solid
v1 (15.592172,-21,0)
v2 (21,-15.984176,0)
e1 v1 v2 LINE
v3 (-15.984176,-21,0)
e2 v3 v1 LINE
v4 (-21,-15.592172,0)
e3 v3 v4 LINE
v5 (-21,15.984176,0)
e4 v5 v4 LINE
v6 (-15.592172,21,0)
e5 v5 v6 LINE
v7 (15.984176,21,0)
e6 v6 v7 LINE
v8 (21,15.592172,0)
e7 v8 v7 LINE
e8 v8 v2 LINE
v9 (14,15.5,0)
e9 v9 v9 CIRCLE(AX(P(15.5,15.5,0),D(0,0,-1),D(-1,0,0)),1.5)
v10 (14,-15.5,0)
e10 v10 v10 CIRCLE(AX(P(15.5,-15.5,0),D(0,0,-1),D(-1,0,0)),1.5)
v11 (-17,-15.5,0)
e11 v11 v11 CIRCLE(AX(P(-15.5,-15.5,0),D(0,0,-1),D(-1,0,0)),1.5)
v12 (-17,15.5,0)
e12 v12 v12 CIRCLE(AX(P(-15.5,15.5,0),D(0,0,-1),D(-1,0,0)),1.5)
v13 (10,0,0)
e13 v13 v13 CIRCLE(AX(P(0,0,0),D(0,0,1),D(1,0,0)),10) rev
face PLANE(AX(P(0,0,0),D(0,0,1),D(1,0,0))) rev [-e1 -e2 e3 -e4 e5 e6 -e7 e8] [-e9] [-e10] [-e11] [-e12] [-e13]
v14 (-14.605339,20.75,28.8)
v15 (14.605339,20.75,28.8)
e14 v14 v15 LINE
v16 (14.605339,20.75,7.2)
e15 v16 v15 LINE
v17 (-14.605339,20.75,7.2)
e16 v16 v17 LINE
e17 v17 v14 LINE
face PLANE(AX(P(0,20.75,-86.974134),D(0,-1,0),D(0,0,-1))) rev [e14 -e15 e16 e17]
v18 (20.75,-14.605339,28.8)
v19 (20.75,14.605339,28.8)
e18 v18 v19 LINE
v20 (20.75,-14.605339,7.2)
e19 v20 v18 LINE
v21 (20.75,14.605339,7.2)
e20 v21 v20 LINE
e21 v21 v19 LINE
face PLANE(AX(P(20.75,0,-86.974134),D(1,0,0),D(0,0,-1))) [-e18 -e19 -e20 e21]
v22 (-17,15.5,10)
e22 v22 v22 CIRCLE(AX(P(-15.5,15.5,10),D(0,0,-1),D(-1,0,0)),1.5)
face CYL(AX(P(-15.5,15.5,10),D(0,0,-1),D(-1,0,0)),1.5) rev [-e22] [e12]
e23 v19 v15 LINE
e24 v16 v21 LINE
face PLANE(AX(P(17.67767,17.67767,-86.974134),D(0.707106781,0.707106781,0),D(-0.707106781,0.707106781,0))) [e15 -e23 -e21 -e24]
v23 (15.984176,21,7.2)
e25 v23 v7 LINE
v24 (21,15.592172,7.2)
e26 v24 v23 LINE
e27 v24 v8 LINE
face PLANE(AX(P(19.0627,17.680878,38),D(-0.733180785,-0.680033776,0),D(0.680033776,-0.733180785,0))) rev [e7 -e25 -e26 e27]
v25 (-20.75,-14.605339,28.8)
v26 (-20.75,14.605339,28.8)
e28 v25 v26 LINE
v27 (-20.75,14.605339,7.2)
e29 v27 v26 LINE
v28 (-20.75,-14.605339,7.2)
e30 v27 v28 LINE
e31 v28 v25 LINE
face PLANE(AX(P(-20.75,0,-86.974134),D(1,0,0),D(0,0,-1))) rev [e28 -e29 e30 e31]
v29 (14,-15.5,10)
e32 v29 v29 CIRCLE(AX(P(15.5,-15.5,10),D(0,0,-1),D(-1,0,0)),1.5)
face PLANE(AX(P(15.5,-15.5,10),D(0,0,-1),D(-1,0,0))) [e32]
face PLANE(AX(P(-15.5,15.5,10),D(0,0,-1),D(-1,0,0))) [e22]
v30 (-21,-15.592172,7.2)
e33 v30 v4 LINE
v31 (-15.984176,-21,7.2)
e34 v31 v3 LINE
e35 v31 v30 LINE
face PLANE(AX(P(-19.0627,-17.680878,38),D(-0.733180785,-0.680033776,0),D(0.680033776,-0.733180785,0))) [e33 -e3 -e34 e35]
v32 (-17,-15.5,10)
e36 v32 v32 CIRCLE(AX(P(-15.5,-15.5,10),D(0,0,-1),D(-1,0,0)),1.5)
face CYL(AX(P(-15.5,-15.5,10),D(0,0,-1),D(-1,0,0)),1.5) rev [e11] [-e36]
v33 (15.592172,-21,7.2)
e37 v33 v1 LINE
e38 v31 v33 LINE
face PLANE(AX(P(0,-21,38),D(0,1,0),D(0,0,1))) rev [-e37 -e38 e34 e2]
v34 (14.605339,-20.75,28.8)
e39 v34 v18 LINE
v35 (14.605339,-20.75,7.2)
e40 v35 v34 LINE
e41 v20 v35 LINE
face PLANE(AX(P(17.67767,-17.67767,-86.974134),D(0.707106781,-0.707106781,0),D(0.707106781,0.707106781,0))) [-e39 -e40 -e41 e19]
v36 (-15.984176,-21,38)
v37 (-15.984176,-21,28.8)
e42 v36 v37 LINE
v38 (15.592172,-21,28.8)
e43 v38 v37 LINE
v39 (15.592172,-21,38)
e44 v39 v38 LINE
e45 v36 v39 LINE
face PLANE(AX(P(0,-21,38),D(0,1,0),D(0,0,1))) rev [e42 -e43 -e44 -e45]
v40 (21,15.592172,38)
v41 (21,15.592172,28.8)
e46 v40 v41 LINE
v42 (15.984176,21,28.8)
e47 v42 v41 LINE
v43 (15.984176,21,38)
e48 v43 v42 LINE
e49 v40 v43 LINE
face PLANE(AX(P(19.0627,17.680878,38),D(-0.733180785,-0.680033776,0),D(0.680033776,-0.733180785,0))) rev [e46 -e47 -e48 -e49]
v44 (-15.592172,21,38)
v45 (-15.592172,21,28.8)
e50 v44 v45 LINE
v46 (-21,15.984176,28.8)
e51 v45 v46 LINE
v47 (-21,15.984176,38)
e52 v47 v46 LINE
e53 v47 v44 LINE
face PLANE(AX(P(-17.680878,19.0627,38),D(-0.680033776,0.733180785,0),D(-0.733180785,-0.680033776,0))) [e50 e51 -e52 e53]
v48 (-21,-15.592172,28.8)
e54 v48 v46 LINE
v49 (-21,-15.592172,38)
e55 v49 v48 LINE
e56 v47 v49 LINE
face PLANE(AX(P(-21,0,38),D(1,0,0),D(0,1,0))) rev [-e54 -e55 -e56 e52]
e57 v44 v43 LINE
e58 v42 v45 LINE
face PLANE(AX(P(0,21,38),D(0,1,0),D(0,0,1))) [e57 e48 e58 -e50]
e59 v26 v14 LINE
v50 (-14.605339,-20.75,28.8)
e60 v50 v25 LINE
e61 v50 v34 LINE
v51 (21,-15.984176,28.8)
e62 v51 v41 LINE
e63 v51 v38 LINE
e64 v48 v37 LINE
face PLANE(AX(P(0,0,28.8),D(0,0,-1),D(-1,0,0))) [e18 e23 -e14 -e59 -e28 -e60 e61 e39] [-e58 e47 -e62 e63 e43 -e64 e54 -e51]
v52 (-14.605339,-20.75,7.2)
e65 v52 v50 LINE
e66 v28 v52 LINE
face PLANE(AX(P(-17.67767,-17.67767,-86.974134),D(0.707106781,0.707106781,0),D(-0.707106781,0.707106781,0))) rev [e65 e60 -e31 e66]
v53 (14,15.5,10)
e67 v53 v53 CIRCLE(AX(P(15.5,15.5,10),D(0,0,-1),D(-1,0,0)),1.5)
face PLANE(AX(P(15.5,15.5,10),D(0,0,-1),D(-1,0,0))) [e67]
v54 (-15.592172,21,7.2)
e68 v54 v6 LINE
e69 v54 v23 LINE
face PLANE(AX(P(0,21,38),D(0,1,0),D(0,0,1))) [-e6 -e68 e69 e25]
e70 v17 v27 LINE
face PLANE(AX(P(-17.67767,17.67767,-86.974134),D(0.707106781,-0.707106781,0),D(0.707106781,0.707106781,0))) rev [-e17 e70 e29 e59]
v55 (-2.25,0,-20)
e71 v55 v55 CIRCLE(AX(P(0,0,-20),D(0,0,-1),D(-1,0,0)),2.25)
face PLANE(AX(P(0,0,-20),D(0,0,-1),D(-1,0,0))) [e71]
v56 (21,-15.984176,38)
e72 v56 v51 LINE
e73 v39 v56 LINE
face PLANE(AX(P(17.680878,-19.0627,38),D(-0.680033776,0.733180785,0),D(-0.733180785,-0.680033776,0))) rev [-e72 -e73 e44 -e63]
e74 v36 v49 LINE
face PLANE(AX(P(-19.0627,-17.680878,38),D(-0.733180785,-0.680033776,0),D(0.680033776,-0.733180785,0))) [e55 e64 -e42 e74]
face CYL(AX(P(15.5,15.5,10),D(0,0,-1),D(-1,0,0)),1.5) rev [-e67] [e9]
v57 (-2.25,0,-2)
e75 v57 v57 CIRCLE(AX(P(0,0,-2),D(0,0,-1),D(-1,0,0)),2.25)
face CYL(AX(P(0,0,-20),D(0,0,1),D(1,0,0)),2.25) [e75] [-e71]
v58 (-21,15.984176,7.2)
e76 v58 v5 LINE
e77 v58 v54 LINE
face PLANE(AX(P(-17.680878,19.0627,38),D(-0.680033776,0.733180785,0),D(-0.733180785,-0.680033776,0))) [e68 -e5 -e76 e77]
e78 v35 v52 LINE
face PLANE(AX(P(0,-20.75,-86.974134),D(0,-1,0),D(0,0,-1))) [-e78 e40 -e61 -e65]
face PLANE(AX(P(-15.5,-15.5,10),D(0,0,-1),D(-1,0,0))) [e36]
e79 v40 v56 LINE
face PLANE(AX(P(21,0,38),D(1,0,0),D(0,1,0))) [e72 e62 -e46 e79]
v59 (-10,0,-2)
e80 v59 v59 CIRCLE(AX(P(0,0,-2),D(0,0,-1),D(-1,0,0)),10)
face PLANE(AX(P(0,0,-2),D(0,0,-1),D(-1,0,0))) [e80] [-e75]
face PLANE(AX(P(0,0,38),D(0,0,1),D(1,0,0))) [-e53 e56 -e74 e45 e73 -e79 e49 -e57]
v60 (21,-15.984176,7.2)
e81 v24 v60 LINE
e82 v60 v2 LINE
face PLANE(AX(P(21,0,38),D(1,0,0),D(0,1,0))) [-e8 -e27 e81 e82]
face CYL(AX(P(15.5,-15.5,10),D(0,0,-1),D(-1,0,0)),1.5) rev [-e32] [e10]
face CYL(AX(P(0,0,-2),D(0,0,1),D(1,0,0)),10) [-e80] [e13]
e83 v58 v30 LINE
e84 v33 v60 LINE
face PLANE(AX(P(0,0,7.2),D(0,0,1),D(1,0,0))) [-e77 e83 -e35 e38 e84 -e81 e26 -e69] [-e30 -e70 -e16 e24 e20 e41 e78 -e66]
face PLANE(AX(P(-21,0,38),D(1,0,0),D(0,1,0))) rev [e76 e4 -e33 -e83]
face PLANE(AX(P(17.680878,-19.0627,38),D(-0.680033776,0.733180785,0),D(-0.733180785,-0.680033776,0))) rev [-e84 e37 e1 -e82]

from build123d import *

# Parameters (mm, degrees)
RESSALTO_EXTRUS_O1_DEPTH   = 38
CORTE_EXTRUS_O_FINA1_START = -30.8
CORTE_EXTRUS_O_FINA1_DEPTH = 21.6
ESBO_O3_R                  = 2.25
RESSALTO_EXTRUS_O2_DEPTH   = 20
ESBO_O4_R                  = 10
RESSALTO_EXTRUS_O3_DEPTH   = 2
ESBO_O5_R                  = 1.5
CORTE_EXTRUS_O1_DEPTH      = 10


# Read off the part's stored shape, not the designer's step: Corte-Extrusão-Fina1
with BuildPart() as part:
    # Esboço1 → Ressalto-extrusão1 (new body)
    with BuildSketch(Plane.XY):
        Polygon((-21, -15.592171873), (-15.984175996, -21), (15.592171873, -21), (21, -15.984175996), (21, 15.592171873), (15.984175996, 21), (-15.592171873, 21), (-21, 15.984175996), align=None)
    extrude(amount=RESSALTO_EXTRUS_O1_DEPTH)

    # Corte-Extrusão-Fina1 outline → Corte-Extrusão-Fina1 (cut)
    with BuildSketch(Plane.XY.offset(38).offset(CORTE_EXTRUS_O_FINA1_START)):
        Polygon((15.592171873, -21), (21, -15.984175996), (21, 15.592171873), (15.984175996, 21), (-15.592171873, 21), (-21, 15.984175996), (-21, -15.592171873), (-15.984175996, -21), align=None)
        Polygon((14.605339059, 20.75), (20.75, 14.605339059), (20.75, -14.605339059), (14.605339059, -20.75), (-14.605339059, -20.75), (-20.75, -14.605339059), (-20.75, 14.605339059), (-14.605339059, 20.75), align=None, mode=Mode.SUBTRACT)
    extrude(amount=CORTE_EXTRUS_O_FINA1_DEPTH, mode=Mode.SUBTRACT)

    # Esboço3 → Ressalto-extrusão2 (add)
    with BuildSketch(Plane(origin=(0, 0, 0), x_dir=(-1, 0, 0), z_dir=(0, 0, -1))):
        with Locations(Location((0, 0, 0), (0, 0, 180))):
            Circle(ESBO_O3_R)
    extrude(amount=RESSALTO_EXTRUS_O2_DEPTH)

    # Esboço4 → Ressalto-extrusão3 (add)
    with BuildSketch(Plane(origin=(0, 0, 0), x_dir=(-1, 0, 0), z_dir=(0, 0, -1))):
        with Locations(Location((0, 0, 0), (0, 0, 180))):
            Circle(ESBO_O4_R)
    extrude(amount=RESSALTO_EXTRUS_O3_DEPTH)

    # Esboço5 → Corte-extrusão1 (cut)
    with BuildSketch(Plane(origin=(0, 0, 0), x_dir=(-1, 0, 0), z_dir=(0, 0, -1))):
        with Locations((15.5, -15.5)):
            Circle(ESBO_O5_R)
        with Locations((-15.5, -15.5)):
            Circle(ESBO_O5_R)
        with Locations((-15.5, 15.5)):
            Circle(ESBO_O5_R)
        with Locations((15.5, 15.5)):
            Circle(ESBO_O5_R)
    extrude(amount=-CORTE_EXTRUS_O1_DEPTH, mode=Mode.SUBTRACT)


solid = part.part
